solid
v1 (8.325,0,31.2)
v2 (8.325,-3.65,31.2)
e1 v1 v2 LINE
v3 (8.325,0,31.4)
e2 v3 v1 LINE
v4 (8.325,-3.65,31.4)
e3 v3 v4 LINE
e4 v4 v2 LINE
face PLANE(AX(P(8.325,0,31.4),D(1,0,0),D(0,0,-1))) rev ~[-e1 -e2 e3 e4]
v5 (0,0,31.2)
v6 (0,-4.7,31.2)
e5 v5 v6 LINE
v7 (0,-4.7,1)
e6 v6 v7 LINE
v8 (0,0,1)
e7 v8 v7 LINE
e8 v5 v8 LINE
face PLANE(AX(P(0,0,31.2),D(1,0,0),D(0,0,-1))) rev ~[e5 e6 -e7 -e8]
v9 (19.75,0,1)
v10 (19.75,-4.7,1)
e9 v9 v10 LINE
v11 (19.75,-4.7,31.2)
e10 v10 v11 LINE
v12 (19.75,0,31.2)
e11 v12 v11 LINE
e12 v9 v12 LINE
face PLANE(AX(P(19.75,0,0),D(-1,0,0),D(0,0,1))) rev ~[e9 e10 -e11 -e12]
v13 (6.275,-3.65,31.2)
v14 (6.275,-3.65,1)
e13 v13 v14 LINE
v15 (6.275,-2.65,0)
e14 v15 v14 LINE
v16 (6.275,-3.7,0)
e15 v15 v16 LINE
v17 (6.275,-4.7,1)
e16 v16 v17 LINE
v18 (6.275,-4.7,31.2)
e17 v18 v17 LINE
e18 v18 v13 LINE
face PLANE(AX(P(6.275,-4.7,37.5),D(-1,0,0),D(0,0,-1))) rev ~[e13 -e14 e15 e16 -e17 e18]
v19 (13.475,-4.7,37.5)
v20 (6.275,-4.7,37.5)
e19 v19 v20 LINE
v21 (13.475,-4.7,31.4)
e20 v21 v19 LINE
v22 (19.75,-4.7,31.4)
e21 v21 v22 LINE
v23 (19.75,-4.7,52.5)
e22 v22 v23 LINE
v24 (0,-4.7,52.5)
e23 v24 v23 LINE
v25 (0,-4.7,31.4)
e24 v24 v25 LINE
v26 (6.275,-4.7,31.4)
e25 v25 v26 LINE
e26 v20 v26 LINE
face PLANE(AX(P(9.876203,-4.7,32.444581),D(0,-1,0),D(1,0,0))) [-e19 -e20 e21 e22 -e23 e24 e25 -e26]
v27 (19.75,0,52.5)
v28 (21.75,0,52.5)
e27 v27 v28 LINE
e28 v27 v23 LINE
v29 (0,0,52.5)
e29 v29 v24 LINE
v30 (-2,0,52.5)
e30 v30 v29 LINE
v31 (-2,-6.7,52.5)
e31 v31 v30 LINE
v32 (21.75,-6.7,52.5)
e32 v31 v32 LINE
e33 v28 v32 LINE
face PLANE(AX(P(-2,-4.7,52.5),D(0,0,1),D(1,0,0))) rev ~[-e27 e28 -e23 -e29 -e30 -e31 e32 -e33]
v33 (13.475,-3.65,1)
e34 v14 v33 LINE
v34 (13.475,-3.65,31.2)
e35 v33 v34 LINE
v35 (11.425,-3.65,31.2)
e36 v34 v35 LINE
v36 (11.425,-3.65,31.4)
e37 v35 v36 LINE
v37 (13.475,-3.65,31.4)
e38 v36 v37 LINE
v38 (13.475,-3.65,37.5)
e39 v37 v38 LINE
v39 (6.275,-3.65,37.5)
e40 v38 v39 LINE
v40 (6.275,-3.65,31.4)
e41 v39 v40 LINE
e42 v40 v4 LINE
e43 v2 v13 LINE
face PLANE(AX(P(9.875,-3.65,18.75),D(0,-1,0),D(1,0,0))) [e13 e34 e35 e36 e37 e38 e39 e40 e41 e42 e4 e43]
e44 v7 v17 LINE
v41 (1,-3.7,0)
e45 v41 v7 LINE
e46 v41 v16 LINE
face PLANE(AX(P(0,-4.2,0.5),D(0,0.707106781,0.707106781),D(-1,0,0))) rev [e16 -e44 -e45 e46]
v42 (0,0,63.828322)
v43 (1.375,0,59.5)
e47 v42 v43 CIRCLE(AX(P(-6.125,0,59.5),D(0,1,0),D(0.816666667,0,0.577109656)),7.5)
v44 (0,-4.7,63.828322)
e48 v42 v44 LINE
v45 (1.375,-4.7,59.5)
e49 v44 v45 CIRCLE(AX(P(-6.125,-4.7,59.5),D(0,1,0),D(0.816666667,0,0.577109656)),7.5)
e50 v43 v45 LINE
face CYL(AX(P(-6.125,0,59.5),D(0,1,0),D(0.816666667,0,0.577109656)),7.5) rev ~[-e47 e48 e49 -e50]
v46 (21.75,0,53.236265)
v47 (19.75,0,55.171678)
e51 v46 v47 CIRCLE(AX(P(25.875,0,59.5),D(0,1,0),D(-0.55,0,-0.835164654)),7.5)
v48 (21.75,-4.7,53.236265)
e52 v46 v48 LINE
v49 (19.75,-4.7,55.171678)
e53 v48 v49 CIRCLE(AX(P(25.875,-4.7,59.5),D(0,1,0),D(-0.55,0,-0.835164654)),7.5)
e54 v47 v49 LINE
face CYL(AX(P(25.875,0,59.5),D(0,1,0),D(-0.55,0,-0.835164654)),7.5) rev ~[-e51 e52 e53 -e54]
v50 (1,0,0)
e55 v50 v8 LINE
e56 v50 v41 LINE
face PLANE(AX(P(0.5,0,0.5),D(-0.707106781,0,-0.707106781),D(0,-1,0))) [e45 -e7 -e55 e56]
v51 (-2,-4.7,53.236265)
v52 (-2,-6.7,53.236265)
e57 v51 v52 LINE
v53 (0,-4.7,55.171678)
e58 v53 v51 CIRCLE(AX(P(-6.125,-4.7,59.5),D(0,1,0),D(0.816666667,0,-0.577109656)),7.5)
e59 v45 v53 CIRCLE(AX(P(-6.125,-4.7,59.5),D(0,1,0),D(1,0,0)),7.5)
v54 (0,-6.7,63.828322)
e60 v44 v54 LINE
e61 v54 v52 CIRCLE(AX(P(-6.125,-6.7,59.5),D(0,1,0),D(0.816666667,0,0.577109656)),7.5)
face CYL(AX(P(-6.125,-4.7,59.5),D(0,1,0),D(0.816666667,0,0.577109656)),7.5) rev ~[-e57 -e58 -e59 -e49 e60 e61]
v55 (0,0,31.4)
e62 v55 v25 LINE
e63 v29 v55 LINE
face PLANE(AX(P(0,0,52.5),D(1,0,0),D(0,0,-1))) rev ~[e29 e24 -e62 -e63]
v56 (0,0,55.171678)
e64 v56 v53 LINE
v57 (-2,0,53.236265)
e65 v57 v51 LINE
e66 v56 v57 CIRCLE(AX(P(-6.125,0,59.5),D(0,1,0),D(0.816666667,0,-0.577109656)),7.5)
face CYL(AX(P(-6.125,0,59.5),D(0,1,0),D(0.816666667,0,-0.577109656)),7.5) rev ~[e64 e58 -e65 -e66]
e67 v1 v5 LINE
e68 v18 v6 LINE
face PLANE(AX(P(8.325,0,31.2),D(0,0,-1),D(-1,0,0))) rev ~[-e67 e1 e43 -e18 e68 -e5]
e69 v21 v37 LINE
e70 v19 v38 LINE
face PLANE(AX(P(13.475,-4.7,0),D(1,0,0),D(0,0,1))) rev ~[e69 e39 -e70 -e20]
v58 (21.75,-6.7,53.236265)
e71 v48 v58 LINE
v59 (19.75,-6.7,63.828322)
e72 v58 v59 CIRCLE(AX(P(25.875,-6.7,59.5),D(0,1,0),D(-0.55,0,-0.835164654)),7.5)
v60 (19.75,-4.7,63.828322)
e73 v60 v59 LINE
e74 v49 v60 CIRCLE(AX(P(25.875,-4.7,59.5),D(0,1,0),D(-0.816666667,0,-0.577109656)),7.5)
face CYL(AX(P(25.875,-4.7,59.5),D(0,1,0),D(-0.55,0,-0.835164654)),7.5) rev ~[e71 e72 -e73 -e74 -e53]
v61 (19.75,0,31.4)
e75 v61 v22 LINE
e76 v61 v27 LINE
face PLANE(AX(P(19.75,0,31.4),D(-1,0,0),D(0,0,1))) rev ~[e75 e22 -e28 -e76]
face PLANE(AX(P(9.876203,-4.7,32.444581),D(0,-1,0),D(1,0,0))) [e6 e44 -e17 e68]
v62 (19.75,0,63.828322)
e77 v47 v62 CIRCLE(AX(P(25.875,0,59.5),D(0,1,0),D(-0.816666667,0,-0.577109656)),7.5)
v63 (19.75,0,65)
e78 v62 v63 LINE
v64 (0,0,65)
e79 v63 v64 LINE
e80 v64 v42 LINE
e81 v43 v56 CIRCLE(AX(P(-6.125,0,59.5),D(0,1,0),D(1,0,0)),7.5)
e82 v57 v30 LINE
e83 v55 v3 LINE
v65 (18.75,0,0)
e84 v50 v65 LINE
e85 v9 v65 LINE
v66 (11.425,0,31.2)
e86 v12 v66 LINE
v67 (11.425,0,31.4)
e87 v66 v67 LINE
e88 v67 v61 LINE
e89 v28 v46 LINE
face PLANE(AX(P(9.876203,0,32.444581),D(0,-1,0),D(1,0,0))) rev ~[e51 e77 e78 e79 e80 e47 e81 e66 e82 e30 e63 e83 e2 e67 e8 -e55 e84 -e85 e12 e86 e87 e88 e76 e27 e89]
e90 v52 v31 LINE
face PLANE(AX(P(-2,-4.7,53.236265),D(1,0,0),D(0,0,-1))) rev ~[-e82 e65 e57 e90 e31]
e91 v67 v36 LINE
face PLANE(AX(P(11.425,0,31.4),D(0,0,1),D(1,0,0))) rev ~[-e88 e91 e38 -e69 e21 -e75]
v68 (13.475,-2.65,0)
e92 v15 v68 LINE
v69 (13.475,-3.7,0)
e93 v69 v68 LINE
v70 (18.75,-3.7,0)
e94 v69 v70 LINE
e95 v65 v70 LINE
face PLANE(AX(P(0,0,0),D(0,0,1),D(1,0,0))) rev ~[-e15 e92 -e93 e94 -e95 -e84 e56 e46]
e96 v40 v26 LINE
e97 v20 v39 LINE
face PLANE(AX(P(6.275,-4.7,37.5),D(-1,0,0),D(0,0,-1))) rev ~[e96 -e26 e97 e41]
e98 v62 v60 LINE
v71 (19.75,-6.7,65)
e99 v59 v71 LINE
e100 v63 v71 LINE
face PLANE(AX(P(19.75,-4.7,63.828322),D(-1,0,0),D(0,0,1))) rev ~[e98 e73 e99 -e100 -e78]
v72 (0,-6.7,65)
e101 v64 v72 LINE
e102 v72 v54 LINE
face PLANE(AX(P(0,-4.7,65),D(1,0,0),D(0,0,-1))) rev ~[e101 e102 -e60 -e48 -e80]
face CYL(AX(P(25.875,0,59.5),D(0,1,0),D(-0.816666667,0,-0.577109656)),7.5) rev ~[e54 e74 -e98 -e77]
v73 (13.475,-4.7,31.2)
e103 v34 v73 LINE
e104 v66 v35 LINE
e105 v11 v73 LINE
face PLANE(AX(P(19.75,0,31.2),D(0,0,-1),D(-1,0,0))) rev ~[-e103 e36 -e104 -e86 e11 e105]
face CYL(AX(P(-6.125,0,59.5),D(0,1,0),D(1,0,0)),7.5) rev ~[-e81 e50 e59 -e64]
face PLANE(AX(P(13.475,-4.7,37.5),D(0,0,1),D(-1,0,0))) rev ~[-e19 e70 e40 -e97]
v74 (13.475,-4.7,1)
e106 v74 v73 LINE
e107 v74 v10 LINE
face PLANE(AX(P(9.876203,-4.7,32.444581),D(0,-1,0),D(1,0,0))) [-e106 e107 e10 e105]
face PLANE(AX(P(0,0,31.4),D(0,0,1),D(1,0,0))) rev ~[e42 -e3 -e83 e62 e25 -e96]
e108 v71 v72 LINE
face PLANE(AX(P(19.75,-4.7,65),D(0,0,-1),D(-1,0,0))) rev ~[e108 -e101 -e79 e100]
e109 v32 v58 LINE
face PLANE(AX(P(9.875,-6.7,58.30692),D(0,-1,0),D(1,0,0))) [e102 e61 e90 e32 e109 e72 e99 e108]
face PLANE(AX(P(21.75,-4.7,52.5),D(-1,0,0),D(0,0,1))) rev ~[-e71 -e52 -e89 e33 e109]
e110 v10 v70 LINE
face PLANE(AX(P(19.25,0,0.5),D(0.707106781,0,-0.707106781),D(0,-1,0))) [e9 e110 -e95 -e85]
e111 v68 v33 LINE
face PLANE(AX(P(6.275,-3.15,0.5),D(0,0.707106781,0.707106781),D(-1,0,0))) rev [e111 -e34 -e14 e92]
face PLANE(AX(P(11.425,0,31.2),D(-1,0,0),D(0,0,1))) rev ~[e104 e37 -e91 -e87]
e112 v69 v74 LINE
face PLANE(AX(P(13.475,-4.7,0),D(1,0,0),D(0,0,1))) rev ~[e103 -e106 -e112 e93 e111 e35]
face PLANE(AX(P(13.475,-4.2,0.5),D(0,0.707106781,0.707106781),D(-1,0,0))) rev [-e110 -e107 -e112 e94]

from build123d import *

# Parameters (mm, degrees)
F1_DEPTH = 4.7
F3_DEPTH = 1.05
F6_DEPTH = 2
F7_SIZE  = 1


with BuildPart() as f1:
    # F0 (on Front) → F1 (new body)
    with BuildSketch(Plane.XZ):
        with BuildLine():
            Line((0, 31.2), (0, 0))
            Line((0, 0), (19.75, 0))
            Line((19.75, 0), (19.75, 31.2))
            Line((19.75, 31.2), (11.425, 31.2))
            Line((11.425, 31.2), (11.425, 31.4))
            Line((11.425, 31.4), (19.75, 31.4))
            Line((19.75, 31.4), (19.75, 52.5))
            Line((19.75, 52.5), (19.75, 55.1716775767))
            ThreePointArc((19.75, 55.1716775767), (18.375, 59.5), (19.75, 63.8283224233))
            Line((19.75, 63.8283224233), (19.75, 65))
            Line((19.75, 65), (0, 65))
            Line((0, 65), (0, 63.8283224233))
            ThreePointArc((0, 63.8283224233), (1.0229892277, 61.7707377656), (1.375, 59.5))
            ThreePointArc((1.375, 59.5), (1.0229892277, 57.2292622344), (0, 55.1716775767))
            Line((0, 55.1716775767), (0, 52.5))
            Line((0, 52.5), (0, 31.4))
            Line((0, 31.4), (8.325, 31.4))
            Line((8.325, 31.4), (8.325, 31.2))
            Line((8.325, 31.2), (0, 31.2))
        make_face()
        with BuildLine():
            Line((-2, 52.5), (0, 52.5))
            Line((0, 52.5), (0, 55.1716775767))
            ThreePointArc((0, 55.1716775767), (-0.9094386331, 54.1103878035), (-2, 53.2362650918))
            Line((-2, 53.2362650918), (-2, 52.5))
        make_face()
        with BuildLine():
            Line((19.75, 55.1716775767), (19.75, 52.5))
            Line((19.75, 52.5), (21.75, 52.5))
            Line((21.75, 52.5), (21.75, 53.2362650918))
            ThreePointArc((21.75, 53.2362650918), (20.6594386331, 54.1103878035), (19.75, 55.1716775767))
        make_face()
    extrude(amount=F1_DEPTH)

    # F2 (on face) → F3 (cut)
    with BuildSketch(Plane.XZ.offset(4.7)):
        Polygon((13.475, 37.5), (6.275, 37.5), (6.275, 2.2), (6.275, 0), (13.475, 0), (13.475, 2.2), align=None)
    extrude(amount=-F3_DEPTH, mode=Mode.SUBTRACT)

    # F5 (on face) → F6 (join)
    with BuildSketch(Plane.XZ.offset(4.7)):
        with BuildLine():
            Line((-2, 52.5), (0, 52.5))
            Line((0, 52.5), (19.75, 52.5))
            Line((19.75, 52.5), (21.75, 52.5))
            Line((21.75, 52.5), (21.75, 53.2362650918))
            ThreePointArc((21.75, 53.2362650918), (18.5052276407, 58.1084342015), (19.75, 63.8283224233))
            Line((19.75, 63.8283224233), (19.75, 65))
            Line((19.75, 65), (0, 65))
            Line((0, 65), (0, 63.8283224233))
            ThreePointArc((0, 63.8283224233), (1.2447723593, 58.1084342015), (-2, 53.2362650918))
            Line((-2, 53.2362650918), (-2, 52.5))
        make_face()
    extrude(amount=F6_DEPTH)

    # F7
    f7_edges = [f1.edges().sort_by_distance(p)[0] for p in [
        (0, -2.35, 0),
        (19.75, -2.35, 0),
        (3.1375, -4.7, 0),
        (16.6125, -4.7, 0),
        (9.875, -3.65, 0),
    ]]
    chamfer(f7_edges, length=F7_SIZE)


solid = f1.part
